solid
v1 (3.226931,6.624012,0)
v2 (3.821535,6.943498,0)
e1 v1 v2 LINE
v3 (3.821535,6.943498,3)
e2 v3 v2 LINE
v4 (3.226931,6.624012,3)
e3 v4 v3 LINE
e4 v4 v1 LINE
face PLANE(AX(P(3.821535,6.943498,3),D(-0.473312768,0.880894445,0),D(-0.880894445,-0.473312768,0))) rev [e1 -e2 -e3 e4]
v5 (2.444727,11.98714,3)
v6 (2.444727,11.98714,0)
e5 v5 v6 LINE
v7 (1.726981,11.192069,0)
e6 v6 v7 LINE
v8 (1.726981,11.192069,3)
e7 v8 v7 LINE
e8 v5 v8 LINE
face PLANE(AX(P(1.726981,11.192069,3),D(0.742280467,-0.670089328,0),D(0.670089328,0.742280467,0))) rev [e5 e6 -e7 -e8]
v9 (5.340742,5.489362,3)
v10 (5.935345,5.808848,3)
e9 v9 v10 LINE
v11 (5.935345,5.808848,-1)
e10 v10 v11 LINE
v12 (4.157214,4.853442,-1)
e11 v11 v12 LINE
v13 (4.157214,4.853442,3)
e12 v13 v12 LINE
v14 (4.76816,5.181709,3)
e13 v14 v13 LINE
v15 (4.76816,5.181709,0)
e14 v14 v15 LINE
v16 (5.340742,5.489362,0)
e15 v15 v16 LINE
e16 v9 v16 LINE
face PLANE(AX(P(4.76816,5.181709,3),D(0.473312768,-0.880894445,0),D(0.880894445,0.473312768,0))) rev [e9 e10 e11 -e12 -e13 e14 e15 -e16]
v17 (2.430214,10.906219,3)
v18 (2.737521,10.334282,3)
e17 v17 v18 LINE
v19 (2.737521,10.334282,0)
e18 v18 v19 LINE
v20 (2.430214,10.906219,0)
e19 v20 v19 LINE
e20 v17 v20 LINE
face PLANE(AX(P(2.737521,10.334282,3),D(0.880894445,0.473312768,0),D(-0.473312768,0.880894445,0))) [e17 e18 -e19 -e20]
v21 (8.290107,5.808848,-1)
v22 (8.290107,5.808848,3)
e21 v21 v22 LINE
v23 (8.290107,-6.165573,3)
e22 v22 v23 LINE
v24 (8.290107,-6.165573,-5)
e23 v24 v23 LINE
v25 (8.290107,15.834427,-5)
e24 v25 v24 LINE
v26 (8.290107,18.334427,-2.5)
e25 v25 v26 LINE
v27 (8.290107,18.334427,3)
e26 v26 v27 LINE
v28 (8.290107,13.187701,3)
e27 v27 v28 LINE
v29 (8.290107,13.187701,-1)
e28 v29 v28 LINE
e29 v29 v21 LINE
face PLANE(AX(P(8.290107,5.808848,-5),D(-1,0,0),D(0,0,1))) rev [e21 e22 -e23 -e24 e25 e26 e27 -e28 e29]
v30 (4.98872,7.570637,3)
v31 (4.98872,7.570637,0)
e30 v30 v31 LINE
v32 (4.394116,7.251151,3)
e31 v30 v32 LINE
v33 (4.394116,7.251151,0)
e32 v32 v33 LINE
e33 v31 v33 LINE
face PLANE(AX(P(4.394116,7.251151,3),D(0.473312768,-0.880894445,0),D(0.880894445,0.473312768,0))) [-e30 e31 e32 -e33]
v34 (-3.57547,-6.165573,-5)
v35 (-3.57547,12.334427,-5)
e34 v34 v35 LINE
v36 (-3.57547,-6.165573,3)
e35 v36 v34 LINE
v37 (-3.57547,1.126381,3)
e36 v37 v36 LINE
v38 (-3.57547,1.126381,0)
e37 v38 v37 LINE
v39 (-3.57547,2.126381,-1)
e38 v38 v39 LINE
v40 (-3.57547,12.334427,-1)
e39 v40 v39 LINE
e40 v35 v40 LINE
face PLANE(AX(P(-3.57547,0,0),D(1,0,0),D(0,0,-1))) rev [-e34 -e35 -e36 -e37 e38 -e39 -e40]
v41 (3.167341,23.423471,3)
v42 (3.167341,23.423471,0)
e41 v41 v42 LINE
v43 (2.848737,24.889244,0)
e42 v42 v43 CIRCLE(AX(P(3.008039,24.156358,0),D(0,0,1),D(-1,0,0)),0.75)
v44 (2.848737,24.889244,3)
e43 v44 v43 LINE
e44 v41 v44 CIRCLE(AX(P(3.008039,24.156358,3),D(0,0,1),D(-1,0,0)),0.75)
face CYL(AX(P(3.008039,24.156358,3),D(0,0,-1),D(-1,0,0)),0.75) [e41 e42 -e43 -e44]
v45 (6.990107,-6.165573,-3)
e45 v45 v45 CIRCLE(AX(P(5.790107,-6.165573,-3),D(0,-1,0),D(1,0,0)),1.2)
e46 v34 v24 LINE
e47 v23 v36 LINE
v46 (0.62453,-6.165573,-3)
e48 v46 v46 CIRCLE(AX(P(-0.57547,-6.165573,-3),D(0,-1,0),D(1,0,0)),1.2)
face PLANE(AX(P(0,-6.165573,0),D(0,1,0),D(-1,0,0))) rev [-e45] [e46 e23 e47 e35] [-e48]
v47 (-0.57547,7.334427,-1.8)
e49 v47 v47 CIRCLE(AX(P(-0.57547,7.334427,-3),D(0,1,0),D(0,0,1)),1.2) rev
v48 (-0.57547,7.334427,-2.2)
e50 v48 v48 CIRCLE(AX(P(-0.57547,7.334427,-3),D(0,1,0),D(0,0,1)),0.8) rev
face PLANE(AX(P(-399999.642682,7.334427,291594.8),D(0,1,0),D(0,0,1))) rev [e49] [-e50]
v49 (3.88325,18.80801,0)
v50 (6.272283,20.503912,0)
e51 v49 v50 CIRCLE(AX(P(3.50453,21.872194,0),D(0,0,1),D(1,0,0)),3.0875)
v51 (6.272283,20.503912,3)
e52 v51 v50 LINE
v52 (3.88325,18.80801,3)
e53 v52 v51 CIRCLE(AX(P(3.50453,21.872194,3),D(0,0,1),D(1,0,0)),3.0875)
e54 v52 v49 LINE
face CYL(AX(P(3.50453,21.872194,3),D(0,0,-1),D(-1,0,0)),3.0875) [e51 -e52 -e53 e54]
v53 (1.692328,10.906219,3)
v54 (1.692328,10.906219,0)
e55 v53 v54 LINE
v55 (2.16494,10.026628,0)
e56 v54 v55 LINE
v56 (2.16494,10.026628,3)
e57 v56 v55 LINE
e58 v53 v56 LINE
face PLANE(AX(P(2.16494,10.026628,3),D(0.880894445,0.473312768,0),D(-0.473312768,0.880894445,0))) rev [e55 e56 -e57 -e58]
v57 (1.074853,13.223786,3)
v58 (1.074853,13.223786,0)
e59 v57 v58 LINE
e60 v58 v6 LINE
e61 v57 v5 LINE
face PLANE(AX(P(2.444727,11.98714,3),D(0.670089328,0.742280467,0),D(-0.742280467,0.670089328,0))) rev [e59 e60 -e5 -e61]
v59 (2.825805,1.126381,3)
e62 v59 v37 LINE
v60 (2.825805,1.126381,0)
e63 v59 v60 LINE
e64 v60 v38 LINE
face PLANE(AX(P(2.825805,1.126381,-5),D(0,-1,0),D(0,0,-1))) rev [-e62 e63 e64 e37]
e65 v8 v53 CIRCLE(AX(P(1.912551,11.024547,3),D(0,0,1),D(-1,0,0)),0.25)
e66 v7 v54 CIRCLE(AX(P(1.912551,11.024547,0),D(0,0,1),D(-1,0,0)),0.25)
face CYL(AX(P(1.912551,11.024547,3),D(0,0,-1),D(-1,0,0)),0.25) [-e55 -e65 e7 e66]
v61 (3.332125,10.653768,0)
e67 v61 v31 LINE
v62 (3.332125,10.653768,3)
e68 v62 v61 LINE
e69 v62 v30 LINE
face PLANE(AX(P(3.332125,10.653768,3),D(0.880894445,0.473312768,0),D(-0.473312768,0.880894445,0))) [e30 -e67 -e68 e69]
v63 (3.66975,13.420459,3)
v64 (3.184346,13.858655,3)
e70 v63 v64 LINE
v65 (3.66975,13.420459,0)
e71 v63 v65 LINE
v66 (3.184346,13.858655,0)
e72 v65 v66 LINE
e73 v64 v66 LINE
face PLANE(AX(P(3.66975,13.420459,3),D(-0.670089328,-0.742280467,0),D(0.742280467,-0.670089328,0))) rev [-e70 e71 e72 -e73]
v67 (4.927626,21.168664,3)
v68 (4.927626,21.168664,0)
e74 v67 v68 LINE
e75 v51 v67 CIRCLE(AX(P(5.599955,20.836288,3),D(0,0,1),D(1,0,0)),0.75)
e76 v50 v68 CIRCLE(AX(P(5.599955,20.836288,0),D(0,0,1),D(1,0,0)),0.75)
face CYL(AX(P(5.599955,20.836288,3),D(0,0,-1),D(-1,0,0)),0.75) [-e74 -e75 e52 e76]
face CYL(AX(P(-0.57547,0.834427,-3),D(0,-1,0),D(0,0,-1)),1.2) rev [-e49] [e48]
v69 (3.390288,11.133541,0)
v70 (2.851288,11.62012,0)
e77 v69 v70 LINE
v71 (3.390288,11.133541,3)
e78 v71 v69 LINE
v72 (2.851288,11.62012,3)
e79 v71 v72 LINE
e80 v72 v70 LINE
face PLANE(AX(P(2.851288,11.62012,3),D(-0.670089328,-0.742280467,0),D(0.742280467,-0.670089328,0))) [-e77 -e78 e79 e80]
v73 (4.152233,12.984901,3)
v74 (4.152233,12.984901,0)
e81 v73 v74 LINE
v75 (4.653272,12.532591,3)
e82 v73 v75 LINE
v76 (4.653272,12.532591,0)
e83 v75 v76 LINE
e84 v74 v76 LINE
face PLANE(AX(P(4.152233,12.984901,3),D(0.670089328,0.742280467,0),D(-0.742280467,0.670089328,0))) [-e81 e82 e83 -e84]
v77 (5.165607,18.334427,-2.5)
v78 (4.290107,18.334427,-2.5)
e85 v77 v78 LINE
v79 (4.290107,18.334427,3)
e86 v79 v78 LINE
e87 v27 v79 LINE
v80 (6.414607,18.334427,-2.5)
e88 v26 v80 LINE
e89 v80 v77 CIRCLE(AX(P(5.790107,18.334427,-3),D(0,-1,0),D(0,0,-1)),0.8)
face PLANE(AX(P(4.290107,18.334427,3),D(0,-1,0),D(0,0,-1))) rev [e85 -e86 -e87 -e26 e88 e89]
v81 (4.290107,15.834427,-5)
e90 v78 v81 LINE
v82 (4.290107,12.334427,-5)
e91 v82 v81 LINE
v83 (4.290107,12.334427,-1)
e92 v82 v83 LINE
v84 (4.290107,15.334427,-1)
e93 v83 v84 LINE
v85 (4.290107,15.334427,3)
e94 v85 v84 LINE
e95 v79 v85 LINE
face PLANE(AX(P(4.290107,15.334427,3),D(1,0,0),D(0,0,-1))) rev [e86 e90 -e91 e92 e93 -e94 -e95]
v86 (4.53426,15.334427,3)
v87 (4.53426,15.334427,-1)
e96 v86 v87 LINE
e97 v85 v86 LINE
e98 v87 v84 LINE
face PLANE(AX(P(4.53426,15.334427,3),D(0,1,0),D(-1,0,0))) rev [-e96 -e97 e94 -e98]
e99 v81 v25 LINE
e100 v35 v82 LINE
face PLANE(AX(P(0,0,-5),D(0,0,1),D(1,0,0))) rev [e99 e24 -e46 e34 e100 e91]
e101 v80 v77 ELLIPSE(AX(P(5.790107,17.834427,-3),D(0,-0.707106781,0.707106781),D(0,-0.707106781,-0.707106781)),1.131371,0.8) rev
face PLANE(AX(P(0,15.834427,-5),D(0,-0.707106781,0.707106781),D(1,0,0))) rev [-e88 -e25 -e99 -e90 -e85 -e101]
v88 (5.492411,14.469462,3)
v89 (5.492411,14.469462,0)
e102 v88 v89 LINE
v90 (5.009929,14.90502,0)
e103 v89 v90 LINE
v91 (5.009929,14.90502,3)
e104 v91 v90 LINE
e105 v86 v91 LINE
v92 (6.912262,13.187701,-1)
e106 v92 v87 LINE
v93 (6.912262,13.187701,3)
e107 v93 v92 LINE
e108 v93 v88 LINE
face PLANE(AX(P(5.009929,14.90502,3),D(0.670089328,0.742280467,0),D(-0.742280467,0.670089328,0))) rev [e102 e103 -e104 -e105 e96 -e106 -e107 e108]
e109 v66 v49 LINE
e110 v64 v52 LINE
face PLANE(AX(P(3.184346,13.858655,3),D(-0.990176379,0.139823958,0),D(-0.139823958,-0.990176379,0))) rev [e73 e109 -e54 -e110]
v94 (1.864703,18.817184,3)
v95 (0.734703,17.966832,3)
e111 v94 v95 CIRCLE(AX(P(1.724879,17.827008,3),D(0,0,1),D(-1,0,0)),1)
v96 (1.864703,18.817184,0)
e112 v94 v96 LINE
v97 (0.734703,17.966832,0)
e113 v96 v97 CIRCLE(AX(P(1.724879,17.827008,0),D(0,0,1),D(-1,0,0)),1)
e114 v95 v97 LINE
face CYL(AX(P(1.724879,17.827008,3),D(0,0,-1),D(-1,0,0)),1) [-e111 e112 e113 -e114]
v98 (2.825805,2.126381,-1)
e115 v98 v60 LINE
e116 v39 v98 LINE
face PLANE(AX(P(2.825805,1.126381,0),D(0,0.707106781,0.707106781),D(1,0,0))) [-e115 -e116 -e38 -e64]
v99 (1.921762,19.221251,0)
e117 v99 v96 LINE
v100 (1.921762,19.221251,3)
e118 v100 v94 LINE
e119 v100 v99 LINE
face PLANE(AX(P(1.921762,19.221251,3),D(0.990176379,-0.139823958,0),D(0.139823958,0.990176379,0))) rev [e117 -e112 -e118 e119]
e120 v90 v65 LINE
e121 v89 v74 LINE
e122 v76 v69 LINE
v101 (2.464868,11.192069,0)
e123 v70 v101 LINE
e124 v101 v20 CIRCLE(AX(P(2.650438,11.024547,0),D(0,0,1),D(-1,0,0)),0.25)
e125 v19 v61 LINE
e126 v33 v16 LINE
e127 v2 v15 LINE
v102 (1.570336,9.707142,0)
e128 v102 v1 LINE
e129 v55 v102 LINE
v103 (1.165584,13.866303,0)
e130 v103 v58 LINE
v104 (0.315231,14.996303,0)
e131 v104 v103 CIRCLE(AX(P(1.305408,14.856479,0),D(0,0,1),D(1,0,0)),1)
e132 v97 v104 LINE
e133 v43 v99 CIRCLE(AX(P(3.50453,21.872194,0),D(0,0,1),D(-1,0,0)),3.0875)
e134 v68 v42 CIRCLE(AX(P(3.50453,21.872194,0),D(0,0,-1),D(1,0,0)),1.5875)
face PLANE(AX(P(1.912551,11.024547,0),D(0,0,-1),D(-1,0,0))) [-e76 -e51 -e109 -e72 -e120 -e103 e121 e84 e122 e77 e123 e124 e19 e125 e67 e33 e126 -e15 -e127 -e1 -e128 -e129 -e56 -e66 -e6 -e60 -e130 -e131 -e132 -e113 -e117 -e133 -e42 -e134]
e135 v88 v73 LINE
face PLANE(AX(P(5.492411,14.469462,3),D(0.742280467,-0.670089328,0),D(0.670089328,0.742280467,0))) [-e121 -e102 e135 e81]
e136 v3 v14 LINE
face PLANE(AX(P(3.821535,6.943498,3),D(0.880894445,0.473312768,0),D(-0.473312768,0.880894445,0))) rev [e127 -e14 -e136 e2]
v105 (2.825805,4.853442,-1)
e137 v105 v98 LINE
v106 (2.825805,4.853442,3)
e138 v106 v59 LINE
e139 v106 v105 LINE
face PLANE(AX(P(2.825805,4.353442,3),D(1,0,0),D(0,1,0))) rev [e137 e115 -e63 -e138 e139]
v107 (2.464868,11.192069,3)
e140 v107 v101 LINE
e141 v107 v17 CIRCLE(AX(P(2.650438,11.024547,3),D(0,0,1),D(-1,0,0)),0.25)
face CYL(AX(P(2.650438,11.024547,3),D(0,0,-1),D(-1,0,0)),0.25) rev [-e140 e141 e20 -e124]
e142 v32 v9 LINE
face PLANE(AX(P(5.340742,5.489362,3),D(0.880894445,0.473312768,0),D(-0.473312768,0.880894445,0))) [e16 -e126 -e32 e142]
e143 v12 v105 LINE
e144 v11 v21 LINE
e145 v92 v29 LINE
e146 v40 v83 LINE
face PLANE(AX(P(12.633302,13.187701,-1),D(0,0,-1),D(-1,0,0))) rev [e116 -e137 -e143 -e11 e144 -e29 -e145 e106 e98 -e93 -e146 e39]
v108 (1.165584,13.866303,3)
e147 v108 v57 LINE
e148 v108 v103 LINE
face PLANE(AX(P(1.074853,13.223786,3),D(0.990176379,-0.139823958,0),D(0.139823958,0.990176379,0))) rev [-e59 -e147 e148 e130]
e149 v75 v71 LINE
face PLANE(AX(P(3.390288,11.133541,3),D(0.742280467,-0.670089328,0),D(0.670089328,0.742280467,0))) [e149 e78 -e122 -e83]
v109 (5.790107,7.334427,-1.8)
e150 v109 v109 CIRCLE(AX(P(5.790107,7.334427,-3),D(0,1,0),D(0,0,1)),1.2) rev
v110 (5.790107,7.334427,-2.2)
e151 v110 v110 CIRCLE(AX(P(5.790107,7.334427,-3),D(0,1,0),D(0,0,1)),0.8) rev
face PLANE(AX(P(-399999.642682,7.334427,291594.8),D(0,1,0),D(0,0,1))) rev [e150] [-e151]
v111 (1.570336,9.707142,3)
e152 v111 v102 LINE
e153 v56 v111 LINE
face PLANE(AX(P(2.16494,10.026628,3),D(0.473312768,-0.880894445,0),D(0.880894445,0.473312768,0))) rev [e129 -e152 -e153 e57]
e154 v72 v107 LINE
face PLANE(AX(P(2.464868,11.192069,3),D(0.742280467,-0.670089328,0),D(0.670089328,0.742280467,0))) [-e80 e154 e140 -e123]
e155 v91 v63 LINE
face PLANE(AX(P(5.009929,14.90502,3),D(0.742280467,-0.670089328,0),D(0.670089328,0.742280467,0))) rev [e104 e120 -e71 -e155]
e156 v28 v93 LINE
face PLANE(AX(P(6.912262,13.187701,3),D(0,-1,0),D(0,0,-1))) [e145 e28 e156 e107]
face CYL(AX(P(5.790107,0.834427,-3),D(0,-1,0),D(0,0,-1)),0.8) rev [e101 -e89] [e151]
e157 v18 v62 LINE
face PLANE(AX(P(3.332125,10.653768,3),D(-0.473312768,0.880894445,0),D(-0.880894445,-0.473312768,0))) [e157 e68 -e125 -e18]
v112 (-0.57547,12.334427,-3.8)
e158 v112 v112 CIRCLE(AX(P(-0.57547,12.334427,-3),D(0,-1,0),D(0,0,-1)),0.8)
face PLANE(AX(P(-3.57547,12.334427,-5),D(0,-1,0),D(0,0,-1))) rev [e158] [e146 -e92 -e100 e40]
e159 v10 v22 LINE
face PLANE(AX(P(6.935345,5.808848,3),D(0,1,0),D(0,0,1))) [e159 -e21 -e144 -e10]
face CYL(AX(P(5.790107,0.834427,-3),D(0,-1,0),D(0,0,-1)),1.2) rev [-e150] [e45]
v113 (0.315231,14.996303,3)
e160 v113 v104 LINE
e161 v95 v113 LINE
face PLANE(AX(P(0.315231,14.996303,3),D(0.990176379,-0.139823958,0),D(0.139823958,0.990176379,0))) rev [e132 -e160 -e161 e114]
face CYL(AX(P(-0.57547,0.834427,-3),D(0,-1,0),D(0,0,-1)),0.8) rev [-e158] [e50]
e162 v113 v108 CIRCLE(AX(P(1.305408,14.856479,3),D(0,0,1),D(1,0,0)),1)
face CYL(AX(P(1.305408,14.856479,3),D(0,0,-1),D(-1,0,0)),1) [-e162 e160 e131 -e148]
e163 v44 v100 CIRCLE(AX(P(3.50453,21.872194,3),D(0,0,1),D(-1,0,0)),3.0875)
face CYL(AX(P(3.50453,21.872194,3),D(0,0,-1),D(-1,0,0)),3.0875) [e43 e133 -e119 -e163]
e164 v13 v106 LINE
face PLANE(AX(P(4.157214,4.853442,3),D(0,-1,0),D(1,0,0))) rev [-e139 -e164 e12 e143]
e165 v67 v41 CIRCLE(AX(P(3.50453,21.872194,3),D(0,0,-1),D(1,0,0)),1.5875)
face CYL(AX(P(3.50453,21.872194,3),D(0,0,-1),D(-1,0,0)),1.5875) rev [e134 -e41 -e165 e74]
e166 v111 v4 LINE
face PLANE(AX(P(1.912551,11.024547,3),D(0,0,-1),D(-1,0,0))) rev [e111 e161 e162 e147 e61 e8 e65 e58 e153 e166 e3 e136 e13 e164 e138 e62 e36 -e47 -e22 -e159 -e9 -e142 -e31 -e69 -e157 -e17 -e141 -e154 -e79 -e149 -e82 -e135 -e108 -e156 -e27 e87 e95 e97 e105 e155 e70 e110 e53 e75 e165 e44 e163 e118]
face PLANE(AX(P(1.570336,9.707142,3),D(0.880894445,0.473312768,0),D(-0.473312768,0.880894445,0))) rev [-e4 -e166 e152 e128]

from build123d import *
from build123d.topology import SkipClean

# Parameters (mm, degrees)
BOSS_SWITCH_BODY_DEPTH        = 3
SKETCH1_W                     = 4
SKETCH1_H                     = 5.146726578
BOSS_FLANGE_WIDTH_DEPTH       = 5
BOSS_FLANGE_HEIGHT_REACH      = 32.536
SKETCH2_W                     = 4
SKETCH2_H                     = 5.146726578
SKETCH2_W_2                   = 8
SKETCH2_H_2                   = 0.29195361
SKETCH17_W                    = 11.865577264
SKETCH17_H                    = 4
BOSS_FLANGE_SUPPORT_DEPTH     = 12.061319812
CUT_WALL_GAP_DEPTH            = 1
SKETCH26_W                    = 7.865577264
SKETCH26_H                    = 6
CUT_CAM_SLOPE_CLEARANCE_DEPTH = 29.549094119
TAP_DRILL_FOR_M2X0_4_TAP1_D   = 1.6
M2_CLEARANCE_HOLE2_D          = 2.4
M2_CLEARANCE_HOLE2_DEPTH      = 6.5
CHAMFER_FLANGE_SUPPORT_3_SIZE = 1
SKETCH25_W                    = 5.078666947
SKETCH25_H                    = 17.5
CUT_BASE_REMOVAL_DEPTH        = 3
CHAMFER8_SIZE                 = 2.5
SKETCH28_R                    = 1.2
BOSS_REAR_FILL_DEPTH          = 7


with BuildPart() as part:
    # Sketch-SwitchBossUp → Boss-Switch Body (new body)
    with BuildSketch(Plane.XY):
        with BuildLine():
            Line((1.921762003, 19.221250523), (1.86470337, 18.817184497))
            ThreePointArc((1.86470337, 18.817184497), (1.123589449, 18.626039018), (0.734703034, 17.966832076))
            Line((0.734703034, 17.966832076), (0.315231161, 14.996302939))
            ThreePointArc((0.315231161, 14.996302939), (0.506376639, 14.255189019), (1.165583582, 13.866302603))
            Line((1.165583582, 13.866302603), (1.074853013, 13.223785628))
            Line((1.074853013, 13.223785628), (1.905726754, 12.473719244))
            Line((1.905726754, 12.473719244), (2.444726799, 11.987140122))
            Line((2.444726799, 11.987140122), (1.726981331, 11.192069347))
            ThreePointArc((1.726981331, 11.192069347), (1.664368515, 11.054634089), (1.692327837, 10.906218823))
            Line((1.692327837, 10.906218823), (2.164939967, 10.026628353))
            Line((2.164939967, 10.026628353), (1.570336216, 9.707142235))
            Line((1.570336216, 9.707142235), (3.226930905, 6.624011677))
            Line((3.226930905, 6.624011677), (3.821534656, 6.943497796))
            Line((3.821534656, 6.943497796), (4.768160192, 5.181708905))
            Line((4.768160192, 5.181708905), (4.157214411, 4.853442062))
            Line((4.157214411, 4.853442062), (2.82580452, 4.853442062))
            Line((2.82580452, 4.853442062), (2.82580452, 4.353442062))
            Line((2.82580452, 4.353442062), (2.82580452, 1.126380759))
            Line((2.82580452, 1.126380759), (3.260297574, 1.126380759))
            Line((3.260297574, 1.126380759), (3.260297574, 0.834427149))
            Line((3.260297574, 0.834427149), (5.219466869, 0.834427149))
            Line((5.219466869, 0.834427149), (13.368774055, 0.834427149))
            Line((13.368774055, 0.834427149), (13.368774055, 18.334427149))
            Line((13.368774055, 18.334427149), (7.056733116, 18.334427149))
            Line((7.056733116, 18.334427149), (4.290107108, 18.334427149))
            Line((4.290107108, 18.334427149), (4.290107108, 15.334427149))
            Line((4.290107108, 15.334427149), (4.534260481, 15.334427149))
            Line((4.534260481, 15.334427149), (5.009929091, 14.905020107))
            Line((5.009929091, 14.905020107), (3.669750435, 13.420459172))
            Line((3.669750435, 13.420459172), (3.184345862, 13.858655297))
            Line((3.184345862, 13.858655297), (3.88324993, 18.808009555))
            ThreePointArc((3.88324993, 18.808009555), (5.291733051, 19.354544283), (6.272283418, 20.503911887))
            ThreePointArc((6.272283418, 20.503911887), (5.932330877, 21.508616953), (4.927625811, 21.168664412))
            ThreePointArc((4.927625811, 21.168664412), (2.253195858, 20.895301387), (3.167340926, 23.423471024))
            ThreePointArc((3.167340926, 23.423471024), (3.740925778, 24.315659579), (2.848737223, 24.889244431))
            ThreePointArc((2.848737223, 24.889244431), (0.457510485, 22.370520646), (1.921762003, 19.221250523))
        make_face()
        with BuildLine():
            Line((6.935345332, 5.808848323), (10.437466736, 5.808848323))
            Line((10.437466736, 5.808848323), (10.437466736, 13.187700571))
            Line((10.437466736, 13.187700571), (6.912261653, 13.187700571))
            Line((6.912261653, 13.187700571), (5.492411395, 14.469462044))
            Line((5.492411395, 14.469462044), (4.152232739, 12.984901109))
            Line((4.152232739, 12.984901109), (4.653272054, 12.532590813))
            Line((4.653272054, 12.532590813), (3.390287689, 11.133540588))
            Line((3.390287689, 11.133540588), (2.851287644, 11.620119709))
            Line((2.851287644, 11.620119709), (2.464867696, 11.192069347))
            ThreePointArc((2.464867696, 11.192069347), (2.40225488, 11.054634089), (2.430214202, 10.906218823))
            Line((2.430214202, 10.906218823), (2.737521356, 10.334281653))
            Line((2.737521356, 10.334281653), (3.332125106, 10.653767771))
            Line((3.332125106, 10.653767771), (4.988719795, 7.570637214))
            Line((4.988719795, 7.570637214), (4.394116045, 7.251151095))
            Line((4.394116045, 7.251151095), (5.340741582, 5.489362205))
            Line((5.340741582, 5.489362205), (5.935345332, 5.808848323))
            Line((5.935345332, 5.808848323), (6.935345332, 5.808848323))
        make_face(mode=Mode.SUBTRACT)
    extrude(amount=BOSS_SWITCH_BODY_DEPTH)

    # Sketch1 → Boss-Flange Width (add)
    with BuildSketch(Plane(origin=(0, 0, 0), x_dir=(-1, 0, 0), z_dir=(0, 0, -1))):
        Polygon((-8.290107108, 5.808848323), (-5.935345332, 5.808848323), (-4.157214411, 4.853442062), (-2.82580452, 4.853442062), (-2.82580452, 1.126380759), (0.412170615, 1.126380759), (0.412170615, 0.834427149), (-8.290107108, 0.834427149), (-8.290107108, 1.426550232), align=None)
        with Locations((-6.290107108, 15.76106386)):
            Rectangle(SKETCH1_W, SKETCH1_H)
    extrude(amount=BOSS_FLANGE_WIDTH_DEPTH)

    # Sketch2 → Boss-Flange Height (add, up to next)
    with BuildSketch(Plane(origin=(-3.575470156, 0, 0), x_dir=(0, 0, -1), z_dir=(1, 0, 0)), mode=Mode.PRIVATE) as boss_flange_height_sk1:
        with Locations((3, 15.76106386)):
            Rectangle(SKETCH2_W, SKETCH2_H)
    boss_flange_height_tool1 = extrude(boss_flange_height_sk1.sketch, amount=BOSS_FLANGE_HEIGHT_REACH, mode=Mode.PRIVATE) - part.part
    # Sketch2 → Boss-Flange Height (add, up to next)
    with BuildSketch(Plane(origin=(-3.575470156, 0, 0), x_dir=(0, 0, -1), z_dir=(1, 0, 0)), mode=Mode.PRIVATE) as boss_flange_height_sk2:
        with Locations((1, 0.980403954)):
            Rectangle(SKETCH2_W_2, SKETCH2_H_2)
    boss_flange_height_tool2 = extrude(boss_flange_height_sk2.sketch, amount=BOSS_FLANGE_HEIGHT_REACH, mode=Mode.PRIVATE) - part.part
    add(boss_flange_height_tool1.solids().sort_by_distance((-3.57547, 15.761064, -3))[0])
    add(boss_flange_height_tool2.solids().sort_by_distance((-3.57547, 0.980404, -1))[0])

    # Sketch17 → Boss-Flange Support (add)
    with BuildSketch(Plane.XZ.offset(-1.126380759)):
        with Locations((2.357318476, -3)):
            Rectangle(SKETCH17_W, SKETCH17_H)
    extrude(amount=-BOSS_FLANGE_SUPPORT_DEPTH)

    # Sketch27 → Cut-Wall Gap (cut)
    with BuildSketch(Plane.XY):
        Polygon((4.290107108, 15.334427149), (4.534260481, 15.334427149), (6.912261653, 13.187700571), (4.290107108, 13.187700571), align=None)
    extrude(amount=-CUT_WALL_GAP_DEPTH, mode=Mode.SUBTRACT)

    # Sketch26 → Cut-Cam Slope Clearance (cut, through all)
    with BuildSketch(Plane.XY.offset(-1)):
        with Locations((0.357318476, 15.334427149)):
            Rectangle(SKETCH26_W, SKETCH26_H)
    extrude(amount=-CUT_CAM_SLOPE_CLEARANCE_DEPTH, mode=Mode.SUBTRACT)

    # Tap Drill for M2x0.4 Tap1 (through all)
    with Locations(Plane(origin=(0, 0.834427149, 0), x_dir=(-1, 0, 0), z_dir=(0, -1, 0))):
        with Locations((0.575470156, 3), (-5.790107108, 3)):
            Hole(TAP_DRILL_FOR_M2X0_4_TAP1_D / 2)

    # M2 Clearance Hole2
    with Locations(Plane.XZ.offset(-0.834427149)):
        with Locations((-0.575470156, -3), (5.790107108, -3)):
            Hole(M2_CLEARANCE_HOLE2_D / 2, depth=M2_CLEARANCE_HOLE2_DEPTH)

    # Chamfer-Flange Support 3
    chamfer_flange_support_3_edges = [part.edges().sort_by_distance(p)[0] for p in [
        (-0.374832818, 1.126380759, -1),
    ]]
    chamfer(chamfer_flange_support_3_edges, length=CHAMFER_FLANGE_SUPPORT_3_SIZE)

    # Sketch25 → Cut-Base Removal (cut)
    with BuildSketch(Plane.XY.offset(3)):
        with Locations((10.829440582, 9.584427149)):
            Rectangle(SKETCH25_W, SKETCH25_H)
    extrude(amount=-CUT_BASE_REMOVAL_DEPTH, mode=Mode.SUBTRACT)

    # Chamfer8
    # the kernel refuses this chamfer: 2.5 mm, written as the material it takes off along each edge
    with BuildSketch(Plane(origin=(14.719314578, 18.334427149, -5), x_dir=(0, -0.9996219169112968, -0.027495876610586317), z_dir=(-1, 0, 0))) as chamfer8_piece_1:
        Polygon((CHAMFER8_SIZE * 0.999621916911, CHAMFER8_SIZE * 0.0274958766106), (-CHAMFER8_SIZE * 0.0274958766106, CHAMFER8_SIZE * 0.999621916911), (0, 0), align=None)
    extrude(amount=16.85841494, mode=Mode.SUBTRACT)

    # Sketch28 → Boss-Rear Fill (add)
    with SkipClean():  # the faces are left unmerged after this step: merging them gives an invalid solid
        with BuildSketch(Plane.XZ.offset(-0.834427149)):
            Polygon((-3.575470156, 3), (8.290107108, 3), (8.290107108, 0), (8.290107108, -5), (-3.575470156, -5), align=None)
            with Locations((5.790107108, -3)):
                Circle(SKETCH28_R, mode=Mode.SUBTRACT)
            with Locations((-0.575470156, -3)):
                Circle(SKETCH28_R, mode=Mode.SUBTRACT)
        extrude(amount=BOSS_REAR_FILL_DEPTH)


solid = part.part
